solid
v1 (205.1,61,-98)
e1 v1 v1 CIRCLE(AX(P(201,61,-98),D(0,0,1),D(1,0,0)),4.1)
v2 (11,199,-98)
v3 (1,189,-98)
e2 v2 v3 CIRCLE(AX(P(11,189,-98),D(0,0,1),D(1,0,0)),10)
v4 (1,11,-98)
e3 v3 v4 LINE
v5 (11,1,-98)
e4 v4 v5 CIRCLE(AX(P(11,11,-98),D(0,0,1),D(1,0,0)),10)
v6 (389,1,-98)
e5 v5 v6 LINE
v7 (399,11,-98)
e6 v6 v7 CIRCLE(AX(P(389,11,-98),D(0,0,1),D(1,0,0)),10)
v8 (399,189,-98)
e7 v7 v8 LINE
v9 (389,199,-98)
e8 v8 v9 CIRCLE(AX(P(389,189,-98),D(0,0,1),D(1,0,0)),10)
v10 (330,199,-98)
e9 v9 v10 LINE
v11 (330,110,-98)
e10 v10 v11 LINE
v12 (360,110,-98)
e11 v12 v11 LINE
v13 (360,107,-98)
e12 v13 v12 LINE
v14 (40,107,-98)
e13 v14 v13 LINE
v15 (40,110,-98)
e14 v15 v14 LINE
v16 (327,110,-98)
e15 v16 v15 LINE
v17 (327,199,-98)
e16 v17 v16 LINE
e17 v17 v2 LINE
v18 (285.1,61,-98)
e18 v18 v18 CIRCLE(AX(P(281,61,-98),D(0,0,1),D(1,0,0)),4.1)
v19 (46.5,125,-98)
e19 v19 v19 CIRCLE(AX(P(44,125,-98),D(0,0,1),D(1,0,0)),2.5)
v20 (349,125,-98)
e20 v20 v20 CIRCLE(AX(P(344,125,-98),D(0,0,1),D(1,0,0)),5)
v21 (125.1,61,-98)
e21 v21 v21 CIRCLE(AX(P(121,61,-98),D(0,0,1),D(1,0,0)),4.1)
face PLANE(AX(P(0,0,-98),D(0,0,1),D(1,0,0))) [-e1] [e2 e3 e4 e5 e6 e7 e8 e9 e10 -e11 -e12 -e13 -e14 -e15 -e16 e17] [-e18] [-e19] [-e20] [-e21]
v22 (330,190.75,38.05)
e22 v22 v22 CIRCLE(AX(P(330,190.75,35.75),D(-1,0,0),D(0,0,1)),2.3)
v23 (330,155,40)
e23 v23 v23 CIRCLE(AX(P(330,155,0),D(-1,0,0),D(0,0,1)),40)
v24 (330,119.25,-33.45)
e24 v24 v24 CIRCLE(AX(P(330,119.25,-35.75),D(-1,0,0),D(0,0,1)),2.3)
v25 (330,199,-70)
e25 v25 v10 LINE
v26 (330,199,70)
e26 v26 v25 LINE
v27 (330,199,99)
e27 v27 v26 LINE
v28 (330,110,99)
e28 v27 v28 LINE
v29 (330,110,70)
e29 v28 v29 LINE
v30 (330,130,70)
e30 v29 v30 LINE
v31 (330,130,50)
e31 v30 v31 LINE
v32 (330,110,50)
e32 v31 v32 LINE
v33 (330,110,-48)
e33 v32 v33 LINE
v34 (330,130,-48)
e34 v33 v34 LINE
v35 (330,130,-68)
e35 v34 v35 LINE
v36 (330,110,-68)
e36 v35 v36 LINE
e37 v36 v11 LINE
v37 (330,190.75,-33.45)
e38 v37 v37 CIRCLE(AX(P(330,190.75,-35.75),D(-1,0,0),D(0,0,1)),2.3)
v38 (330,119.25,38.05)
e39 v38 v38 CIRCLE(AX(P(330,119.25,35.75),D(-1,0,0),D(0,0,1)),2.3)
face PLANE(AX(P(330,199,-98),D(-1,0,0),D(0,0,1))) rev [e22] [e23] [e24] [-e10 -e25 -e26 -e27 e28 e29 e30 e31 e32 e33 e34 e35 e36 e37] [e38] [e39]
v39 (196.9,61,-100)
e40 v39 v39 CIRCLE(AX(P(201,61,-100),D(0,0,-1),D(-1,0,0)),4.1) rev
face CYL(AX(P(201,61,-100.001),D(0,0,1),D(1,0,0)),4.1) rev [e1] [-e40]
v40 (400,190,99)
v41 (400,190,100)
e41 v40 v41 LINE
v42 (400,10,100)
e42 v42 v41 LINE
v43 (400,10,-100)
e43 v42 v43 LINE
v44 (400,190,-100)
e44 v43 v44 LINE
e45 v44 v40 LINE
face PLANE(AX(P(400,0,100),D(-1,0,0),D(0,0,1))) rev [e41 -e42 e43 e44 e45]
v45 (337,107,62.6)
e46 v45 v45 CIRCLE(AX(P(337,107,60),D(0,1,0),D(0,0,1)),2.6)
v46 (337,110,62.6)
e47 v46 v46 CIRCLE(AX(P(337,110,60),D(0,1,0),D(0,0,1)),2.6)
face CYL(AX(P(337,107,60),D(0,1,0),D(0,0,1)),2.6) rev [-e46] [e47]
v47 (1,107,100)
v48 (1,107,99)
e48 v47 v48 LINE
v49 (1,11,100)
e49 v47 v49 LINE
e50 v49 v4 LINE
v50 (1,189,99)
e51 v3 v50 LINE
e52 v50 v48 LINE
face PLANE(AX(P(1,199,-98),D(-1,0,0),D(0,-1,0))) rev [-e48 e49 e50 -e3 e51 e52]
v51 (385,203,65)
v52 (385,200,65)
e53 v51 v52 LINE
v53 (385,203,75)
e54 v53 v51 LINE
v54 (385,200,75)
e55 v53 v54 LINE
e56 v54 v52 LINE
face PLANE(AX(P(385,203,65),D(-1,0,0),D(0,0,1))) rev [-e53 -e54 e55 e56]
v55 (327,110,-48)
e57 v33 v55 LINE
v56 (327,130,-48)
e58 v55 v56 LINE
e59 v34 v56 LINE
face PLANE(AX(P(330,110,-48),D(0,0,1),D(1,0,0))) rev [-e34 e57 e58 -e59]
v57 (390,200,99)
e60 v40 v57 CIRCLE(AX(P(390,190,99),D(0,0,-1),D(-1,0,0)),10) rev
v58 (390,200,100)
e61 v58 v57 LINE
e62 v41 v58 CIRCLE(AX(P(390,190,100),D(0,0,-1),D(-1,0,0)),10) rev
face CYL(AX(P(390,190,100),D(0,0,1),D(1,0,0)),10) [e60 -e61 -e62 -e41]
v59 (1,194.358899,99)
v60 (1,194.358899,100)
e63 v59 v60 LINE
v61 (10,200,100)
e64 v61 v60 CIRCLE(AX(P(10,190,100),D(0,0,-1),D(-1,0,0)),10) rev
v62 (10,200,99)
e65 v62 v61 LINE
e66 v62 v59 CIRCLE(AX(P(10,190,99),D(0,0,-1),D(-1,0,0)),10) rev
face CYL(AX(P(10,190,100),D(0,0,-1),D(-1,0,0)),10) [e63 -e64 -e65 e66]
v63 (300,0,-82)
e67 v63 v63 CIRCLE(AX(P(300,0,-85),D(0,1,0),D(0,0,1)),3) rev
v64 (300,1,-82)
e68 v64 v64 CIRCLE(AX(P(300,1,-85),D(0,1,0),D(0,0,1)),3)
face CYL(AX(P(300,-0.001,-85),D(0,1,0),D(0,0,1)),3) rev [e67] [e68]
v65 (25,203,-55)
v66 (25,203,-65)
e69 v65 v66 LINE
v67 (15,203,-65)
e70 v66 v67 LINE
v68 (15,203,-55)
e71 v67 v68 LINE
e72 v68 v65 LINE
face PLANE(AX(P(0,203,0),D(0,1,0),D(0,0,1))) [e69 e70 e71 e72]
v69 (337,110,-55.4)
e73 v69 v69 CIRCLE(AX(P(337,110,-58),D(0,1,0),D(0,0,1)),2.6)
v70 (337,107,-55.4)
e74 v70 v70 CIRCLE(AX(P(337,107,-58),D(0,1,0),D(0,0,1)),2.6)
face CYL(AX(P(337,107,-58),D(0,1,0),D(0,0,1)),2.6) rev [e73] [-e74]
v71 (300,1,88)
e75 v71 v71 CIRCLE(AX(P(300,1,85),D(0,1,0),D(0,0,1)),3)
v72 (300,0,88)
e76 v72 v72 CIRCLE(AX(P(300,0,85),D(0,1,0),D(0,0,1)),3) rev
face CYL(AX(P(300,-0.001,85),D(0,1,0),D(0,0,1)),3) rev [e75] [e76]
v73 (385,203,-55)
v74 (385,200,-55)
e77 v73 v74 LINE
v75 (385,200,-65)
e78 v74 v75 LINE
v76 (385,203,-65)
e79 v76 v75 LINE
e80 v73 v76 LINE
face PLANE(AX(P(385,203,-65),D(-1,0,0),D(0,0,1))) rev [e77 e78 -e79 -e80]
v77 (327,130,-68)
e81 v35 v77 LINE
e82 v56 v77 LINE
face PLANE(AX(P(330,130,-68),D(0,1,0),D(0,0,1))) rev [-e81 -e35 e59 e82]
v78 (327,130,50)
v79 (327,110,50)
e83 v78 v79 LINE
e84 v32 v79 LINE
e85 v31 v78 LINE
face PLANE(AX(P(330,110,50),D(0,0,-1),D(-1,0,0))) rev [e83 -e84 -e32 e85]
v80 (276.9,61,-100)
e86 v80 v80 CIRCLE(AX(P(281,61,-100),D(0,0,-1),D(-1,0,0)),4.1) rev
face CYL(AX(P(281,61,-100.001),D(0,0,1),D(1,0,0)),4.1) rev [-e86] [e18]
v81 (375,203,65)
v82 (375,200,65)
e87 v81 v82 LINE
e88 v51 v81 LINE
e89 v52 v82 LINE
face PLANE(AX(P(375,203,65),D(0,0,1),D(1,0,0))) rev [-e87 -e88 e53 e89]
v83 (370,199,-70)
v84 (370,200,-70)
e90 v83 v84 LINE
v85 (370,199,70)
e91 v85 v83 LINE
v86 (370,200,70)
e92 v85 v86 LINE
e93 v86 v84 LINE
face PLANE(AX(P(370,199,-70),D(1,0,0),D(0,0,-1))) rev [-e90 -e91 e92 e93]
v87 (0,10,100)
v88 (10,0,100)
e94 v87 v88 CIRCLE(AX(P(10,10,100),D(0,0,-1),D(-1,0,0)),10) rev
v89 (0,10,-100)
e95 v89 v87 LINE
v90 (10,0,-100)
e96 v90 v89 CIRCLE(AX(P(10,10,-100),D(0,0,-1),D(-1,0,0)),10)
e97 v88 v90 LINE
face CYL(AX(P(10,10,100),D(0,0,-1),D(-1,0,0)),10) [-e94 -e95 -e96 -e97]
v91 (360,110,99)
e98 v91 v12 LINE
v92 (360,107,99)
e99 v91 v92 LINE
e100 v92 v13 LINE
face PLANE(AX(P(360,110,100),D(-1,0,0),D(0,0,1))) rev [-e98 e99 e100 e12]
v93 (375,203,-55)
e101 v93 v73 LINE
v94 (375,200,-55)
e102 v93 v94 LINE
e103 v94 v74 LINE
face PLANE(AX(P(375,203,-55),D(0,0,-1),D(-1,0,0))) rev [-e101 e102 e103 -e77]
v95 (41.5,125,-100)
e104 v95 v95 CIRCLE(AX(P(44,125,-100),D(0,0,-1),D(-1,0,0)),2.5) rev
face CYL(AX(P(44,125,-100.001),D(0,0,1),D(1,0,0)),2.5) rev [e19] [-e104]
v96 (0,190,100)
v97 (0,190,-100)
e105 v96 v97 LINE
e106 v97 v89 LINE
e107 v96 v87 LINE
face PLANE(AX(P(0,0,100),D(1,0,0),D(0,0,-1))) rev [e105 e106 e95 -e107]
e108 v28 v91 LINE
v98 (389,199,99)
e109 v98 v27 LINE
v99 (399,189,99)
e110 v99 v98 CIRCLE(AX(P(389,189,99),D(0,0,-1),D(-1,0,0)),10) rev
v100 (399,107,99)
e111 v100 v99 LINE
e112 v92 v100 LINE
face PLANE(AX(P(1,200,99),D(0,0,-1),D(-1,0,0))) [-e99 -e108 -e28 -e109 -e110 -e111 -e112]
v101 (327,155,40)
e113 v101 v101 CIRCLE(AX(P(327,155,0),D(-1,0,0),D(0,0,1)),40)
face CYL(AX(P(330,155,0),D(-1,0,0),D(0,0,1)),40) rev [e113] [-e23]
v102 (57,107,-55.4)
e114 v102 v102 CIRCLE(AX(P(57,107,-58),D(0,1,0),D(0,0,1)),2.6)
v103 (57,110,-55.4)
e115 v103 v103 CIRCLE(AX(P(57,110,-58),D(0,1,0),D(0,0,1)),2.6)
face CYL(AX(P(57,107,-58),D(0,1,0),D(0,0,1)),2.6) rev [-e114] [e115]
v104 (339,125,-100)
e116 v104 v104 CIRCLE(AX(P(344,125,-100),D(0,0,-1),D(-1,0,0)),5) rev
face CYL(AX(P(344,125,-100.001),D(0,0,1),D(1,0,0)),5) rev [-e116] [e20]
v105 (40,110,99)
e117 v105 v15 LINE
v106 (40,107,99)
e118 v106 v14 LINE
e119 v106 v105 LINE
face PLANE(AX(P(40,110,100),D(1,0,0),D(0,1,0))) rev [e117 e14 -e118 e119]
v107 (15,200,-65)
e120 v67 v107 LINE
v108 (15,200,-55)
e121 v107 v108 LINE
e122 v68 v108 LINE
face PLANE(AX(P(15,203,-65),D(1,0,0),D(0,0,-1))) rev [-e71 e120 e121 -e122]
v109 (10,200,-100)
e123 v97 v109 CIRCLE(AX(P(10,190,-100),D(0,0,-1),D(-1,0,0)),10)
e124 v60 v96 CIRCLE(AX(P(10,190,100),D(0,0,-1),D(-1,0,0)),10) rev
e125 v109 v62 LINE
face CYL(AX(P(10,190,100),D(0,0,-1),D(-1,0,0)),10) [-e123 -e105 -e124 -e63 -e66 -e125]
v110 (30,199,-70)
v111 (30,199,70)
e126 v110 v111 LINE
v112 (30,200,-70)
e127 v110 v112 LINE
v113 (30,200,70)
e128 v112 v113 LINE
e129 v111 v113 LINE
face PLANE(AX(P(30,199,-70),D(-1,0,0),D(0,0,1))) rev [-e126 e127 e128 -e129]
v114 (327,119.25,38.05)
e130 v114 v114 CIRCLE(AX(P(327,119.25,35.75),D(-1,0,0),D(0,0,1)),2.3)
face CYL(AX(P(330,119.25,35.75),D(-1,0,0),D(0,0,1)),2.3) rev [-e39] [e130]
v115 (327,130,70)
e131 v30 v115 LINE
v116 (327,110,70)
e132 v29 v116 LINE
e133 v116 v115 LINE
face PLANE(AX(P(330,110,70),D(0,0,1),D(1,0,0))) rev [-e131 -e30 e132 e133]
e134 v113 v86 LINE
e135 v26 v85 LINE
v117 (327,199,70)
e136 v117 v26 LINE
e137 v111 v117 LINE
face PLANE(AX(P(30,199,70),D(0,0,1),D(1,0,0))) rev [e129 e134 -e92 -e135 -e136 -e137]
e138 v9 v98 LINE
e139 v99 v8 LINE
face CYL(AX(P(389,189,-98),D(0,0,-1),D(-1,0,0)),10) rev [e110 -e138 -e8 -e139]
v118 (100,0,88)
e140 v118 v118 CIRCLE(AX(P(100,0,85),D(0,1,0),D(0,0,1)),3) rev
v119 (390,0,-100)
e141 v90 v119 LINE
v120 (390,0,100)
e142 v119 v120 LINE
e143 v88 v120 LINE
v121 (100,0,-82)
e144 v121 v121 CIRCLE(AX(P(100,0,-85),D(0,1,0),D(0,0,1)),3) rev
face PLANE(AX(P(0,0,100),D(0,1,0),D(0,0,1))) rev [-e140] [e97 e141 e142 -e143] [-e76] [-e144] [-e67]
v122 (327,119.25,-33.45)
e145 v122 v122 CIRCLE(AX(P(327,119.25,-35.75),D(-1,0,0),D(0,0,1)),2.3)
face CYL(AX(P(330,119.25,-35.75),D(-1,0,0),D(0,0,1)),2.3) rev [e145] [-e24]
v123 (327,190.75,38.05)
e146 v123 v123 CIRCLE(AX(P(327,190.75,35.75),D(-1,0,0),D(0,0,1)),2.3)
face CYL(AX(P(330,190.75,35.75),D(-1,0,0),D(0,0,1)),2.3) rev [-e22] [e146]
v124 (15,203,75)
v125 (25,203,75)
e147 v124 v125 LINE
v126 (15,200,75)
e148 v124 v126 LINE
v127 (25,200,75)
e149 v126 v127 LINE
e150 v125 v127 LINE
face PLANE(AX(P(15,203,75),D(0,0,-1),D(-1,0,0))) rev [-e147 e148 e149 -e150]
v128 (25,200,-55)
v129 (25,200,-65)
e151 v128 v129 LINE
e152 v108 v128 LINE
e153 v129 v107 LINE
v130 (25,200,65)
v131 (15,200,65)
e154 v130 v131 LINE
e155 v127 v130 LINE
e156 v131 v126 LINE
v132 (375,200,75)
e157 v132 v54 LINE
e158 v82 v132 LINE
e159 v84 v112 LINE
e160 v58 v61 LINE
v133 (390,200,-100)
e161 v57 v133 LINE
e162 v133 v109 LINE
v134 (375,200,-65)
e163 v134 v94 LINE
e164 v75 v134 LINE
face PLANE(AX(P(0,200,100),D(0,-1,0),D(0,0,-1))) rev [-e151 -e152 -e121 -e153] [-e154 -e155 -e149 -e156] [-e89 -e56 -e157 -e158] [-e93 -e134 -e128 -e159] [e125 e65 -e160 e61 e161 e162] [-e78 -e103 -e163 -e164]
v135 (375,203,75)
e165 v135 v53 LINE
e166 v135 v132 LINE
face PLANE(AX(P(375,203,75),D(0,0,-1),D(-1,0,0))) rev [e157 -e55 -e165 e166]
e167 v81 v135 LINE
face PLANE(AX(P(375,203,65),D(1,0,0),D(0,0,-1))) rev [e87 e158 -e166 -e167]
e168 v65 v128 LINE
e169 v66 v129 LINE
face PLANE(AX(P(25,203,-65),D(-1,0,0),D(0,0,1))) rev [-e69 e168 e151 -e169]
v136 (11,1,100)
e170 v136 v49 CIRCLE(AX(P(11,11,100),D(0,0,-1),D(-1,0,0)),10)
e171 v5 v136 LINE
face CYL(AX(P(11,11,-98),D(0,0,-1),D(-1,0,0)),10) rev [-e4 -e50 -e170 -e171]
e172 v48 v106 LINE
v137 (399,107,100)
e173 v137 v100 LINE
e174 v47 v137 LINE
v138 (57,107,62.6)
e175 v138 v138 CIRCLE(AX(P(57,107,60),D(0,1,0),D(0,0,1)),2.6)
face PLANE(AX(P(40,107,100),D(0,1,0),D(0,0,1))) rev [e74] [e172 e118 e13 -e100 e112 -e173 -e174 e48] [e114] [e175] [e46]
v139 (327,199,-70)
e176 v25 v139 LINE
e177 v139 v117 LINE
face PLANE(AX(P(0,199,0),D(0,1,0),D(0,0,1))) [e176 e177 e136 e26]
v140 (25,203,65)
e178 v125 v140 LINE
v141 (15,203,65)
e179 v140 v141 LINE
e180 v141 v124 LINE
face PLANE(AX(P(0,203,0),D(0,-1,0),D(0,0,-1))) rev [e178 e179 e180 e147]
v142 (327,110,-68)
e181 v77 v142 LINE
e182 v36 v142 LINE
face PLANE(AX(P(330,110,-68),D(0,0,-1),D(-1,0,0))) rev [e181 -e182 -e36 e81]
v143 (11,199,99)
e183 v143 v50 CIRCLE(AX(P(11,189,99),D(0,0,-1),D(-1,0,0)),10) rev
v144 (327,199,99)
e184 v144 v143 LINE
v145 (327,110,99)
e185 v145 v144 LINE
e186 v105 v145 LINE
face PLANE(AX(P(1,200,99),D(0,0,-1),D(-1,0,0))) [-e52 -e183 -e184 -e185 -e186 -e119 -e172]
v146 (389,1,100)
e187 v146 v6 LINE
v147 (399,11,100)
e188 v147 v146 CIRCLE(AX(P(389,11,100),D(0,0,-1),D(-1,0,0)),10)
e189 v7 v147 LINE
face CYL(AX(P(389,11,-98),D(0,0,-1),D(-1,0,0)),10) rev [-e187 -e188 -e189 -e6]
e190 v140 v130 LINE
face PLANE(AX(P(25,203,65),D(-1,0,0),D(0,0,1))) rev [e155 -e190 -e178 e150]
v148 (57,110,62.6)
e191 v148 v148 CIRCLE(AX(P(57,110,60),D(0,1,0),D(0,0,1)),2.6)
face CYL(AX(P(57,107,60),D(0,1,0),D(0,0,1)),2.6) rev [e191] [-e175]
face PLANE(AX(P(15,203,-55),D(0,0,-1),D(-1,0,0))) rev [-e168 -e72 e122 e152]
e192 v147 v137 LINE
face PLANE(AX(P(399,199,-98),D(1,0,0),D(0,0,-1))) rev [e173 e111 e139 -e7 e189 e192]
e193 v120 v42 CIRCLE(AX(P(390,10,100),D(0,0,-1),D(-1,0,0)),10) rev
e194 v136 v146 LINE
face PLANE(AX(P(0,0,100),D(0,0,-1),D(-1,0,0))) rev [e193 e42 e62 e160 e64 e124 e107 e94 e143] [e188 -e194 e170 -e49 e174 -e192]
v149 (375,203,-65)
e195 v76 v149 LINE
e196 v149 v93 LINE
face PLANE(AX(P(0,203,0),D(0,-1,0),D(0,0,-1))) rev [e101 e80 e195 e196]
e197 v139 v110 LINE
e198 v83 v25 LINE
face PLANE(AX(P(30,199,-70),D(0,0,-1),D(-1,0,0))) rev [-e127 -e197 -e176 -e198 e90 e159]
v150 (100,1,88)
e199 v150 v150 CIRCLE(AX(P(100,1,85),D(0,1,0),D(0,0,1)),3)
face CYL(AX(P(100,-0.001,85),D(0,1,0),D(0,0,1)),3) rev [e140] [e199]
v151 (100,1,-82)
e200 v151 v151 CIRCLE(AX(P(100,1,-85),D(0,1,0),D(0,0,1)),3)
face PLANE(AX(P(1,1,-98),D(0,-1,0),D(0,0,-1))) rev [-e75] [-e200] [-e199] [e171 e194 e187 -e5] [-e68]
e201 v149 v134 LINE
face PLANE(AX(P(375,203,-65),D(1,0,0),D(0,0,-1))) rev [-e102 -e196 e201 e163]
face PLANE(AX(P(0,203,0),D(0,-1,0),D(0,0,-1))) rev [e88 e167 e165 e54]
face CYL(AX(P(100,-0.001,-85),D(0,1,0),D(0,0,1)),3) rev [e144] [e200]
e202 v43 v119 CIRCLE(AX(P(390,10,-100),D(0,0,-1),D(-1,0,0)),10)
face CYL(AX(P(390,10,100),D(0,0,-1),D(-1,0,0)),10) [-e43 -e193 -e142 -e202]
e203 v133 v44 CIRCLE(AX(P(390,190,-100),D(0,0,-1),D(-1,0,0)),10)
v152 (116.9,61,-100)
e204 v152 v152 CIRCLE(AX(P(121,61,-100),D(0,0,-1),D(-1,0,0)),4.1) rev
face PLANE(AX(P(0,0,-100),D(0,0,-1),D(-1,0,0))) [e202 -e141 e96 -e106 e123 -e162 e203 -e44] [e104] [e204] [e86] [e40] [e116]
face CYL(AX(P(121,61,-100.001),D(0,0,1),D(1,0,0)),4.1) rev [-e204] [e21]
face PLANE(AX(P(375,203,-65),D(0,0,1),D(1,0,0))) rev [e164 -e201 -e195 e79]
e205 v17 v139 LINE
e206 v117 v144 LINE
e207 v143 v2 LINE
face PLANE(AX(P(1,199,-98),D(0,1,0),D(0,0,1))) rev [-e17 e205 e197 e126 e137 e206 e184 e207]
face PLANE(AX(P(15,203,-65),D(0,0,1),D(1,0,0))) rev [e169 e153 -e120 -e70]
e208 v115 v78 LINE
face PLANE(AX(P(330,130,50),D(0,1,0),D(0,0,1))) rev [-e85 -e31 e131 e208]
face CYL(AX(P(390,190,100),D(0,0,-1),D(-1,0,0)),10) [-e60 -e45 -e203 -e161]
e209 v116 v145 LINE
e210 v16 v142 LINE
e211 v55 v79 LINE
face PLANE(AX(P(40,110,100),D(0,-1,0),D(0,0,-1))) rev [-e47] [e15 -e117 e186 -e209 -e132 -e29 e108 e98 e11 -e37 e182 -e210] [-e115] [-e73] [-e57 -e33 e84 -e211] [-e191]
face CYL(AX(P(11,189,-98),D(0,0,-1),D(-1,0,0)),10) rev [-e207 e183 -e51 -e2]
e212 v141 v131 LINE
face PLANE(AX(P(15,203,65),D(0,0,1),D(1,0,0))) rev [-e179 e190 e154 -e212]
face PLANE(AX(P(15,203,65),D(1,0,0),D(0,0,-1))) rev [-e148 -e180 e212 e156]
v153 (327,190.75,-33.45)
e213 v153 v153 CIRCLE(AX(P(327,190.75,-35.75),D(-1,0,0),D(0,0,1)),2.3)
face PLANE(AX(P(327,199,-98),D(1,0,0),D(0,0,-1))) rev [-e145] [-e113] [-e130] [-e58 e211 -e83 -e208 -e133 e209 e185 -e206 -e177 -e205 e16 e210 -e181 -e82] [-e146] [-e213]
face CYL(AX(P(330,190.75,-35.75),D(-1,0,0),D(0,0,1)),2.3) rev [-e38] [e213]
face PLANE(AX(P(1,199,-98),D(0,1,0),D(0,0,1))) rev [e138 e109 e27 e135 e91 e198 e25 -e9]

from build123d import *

# Parameters (mm, degrees)
SKETCH1_W                 = 400
SKETCH1_H                 = 200
KHUNG_TRONG_DEPTH         = 100
SKETCH2_W                 = 398
SKETCH2_H                 = 198
DO_DAY_1MM_DEPTH          = 198
FILLET_10MM_4_GOC_R       = 10
SKETCH3_W                 = 320
SKETCH3_H                 = 3
TRAN_GIA_DEPTH            = 198
SKETCH5_W                 = 3
SKETCH5_H                 = 198
GIA_DO_QUAT_DEPTH         = 89
SKETCH6_R                 = 40
LO_DAT_QUAT_DEPTH         = 3
SKETCH7_R                 = 2.3
CO_DINH_QUAT_DEPTH        = 3
SKETCH9_W                 = 20
SKETCH9_H                 = 20
LO_THONG_CHO_DEN_DEPTH    = 3
SKETCH10_R                = 2.6
GIA_DO_DEN_DEPTH          = 3
DAY_NGUON_DEN_QUAT_REACH  = 491.085
SKETCH12_R                = 5
DAY_NGUON_DEN_REACH       = 491.085
SKETCH13_R                = 2.5
F_2_THANH_RAY_TANG1_REACH = 459.822
SKETCH14_R                = 3
GAN_CAM_BIEN_REACH        = 491.085
SKETCH15_R                = 4.1
SKETCH16_W                = 340
SKETCH16_H                = 140
NAP_THAM_DEPTH            = 1
SKETCH18_W                = 399
SKETCH18_H                = 1
CHE_TRAN_DEPTH            = 93
FILLET4_R                 = 10
SKETCH19_W                = 10
SKETCH19_H                = 10
CHOT_CO_DINH_DEPTH        = 3


with BuildPart() as part:
    # Sketch1 → khung_trong (new, symmetric)
    with BuildSketch(Plane.XY):
        with Locations((200, 100)):
            Rectangle(SKETCH1_W, SKETCH1_H)
    extrude(amount=KHUNG_TRONG_DEPTH, both=True)

    # Sketch2 → do_day_1mm (cut)
    with BuildSketch(Plane.XY.offset(100)):
        with Locations((200, 100)):
            Rectangle(SKETCH2_W, SKETCH2_H)
    extrude(amount=-DO_DAY_1MM_DEPTH, mode=Mode.SUBTRACT)

    # Fillet_10mm_4_goc
    fillet_10mm_4_goc_edges = [part.edges().sort_by_distance(p)[0] for p in [
        (1, 1, 1),
        (1, 199, 1),
        (399, 199, 1),
        (399, 1, 1),
        (0, 200, 0),
        (400, 200, 0),
        (400, 0, 0),
        (0, 0, 0),
    ]]
    fillet(fillet_10mm_4_goc_edges, radius=FILLET_10MM_4_GOC_R)

    # Sketch3 → tran_gia (add)
    with BuildSketch(Plane.XY.offset(-98)):
        with Locations((200, 108.5)):
            Rectangle(SKETCH3_W, SKETCH3_H)
    extrude(amount=TRAN_GIA_DEPTH)

    # Sketch5 → gia_do_quat (add)
    with BuildSketch(Plane(origin=(0, 110, 0), x_dir=(1, 0, 0), z_dir=(0, 1, 0))):
        with Locations((328.5, -1)):
            Rectangle(SKETCH5_W, SKETCH5_H)
    extrude(amount=GIA_DO_QUAT_DEPTH)

    # Sketch6 → lo_dat_quat (cut)
    with BuildSketch(Plane.ZY.offset(-327)):
        with Locations((0, 155)):
            Circle(SKETCH6_R)
    extrude(amount=-LO_DAT_QUAT_DEPTH, mode=Mode.SUBTRACT)

    # Sketch7 → co_dinh_quat (cut)
    with BuildSketch(Plane.ZY.offset(-327)):
        with Locations((-35.75, 190.75)):
            Circle(SKETCH7_R)
        with Locations((35.75, 190.75)):
            Circle(SKETCH7_R)
        with Locations((35.75, 119.25)):
            Circle(SKETCH7_R)
        with Locations((-35.75, 119.25)):
            Circle(SKETCH7_R)
    extrude(amount=-CO_DINH_QUAT_DEPTH, mode=Mode.SUBTRACT)

    # Sketch9 → lo_thong_cho _den (cut)
    with BuildSketch(Plane.ZY.offset(-327)):
        with Locations((-58, 120)):
            Rectangle(SKETCH9_W, SKETCH9_H)
        with Locations((60, 120)):
            Rectangle(SKETCH9_W, SKETCH9_H)
    extrude(amount=-LO_THONG_CHO_DEN_DEPTH, mode=Mode.SUBTRACT)

    # Sketch10 → gia_do_den (cut)
    with BuildSketch(Plane(origin=(0, 110, 0), x_dir=(1, 0, 0), z_dir=(0, 1, 0))):
        with Locations(Location((337, 58, 0), (0, 0, 270))):
            Circle(SKETCH10_R)
        with Locations(Location((337, -60, 0), (0, 0, 270))):
            Circle(SKETCH10_R)
        with Locations(Location((57, 58, 0), (0, 0, 270))):
            Circle(SKETCH10_R)
        with Locations(Location((57, -60, 0), (0, 0, 270))):
            Circle(SKETCH10_R)
    extrude(amount=-GIA_DO_DEN_DEPTH, mode=Mode.SUBTRACT)

    # Sketch12 → day_nguon_den_quat (cut, up to next)
    with BuildSketch(Plane.XY.offset(-98), mode=Mode.PRIVATE) as day_nguon_den_quat_sk1:
        with Locations((344, 125)):
            Circle(SKETCH12_R)
    day_nguon_den_quat_tool1 = extrude(day_nguon_den_quat_sk1.sketch, amount=-DAY_NGUON_DEN_QUAT_REACH, mode=Mode.PRIVATE) & part.part
    add(day_nguon_den_quat_tool1.solids().sort_by_distance((344, 125, -98))[0], mode=Mode.SUBTRACT)

    # Sketch13 → day_nguon_den (cut, up to next)
    with BuildSketch(Plane.XY.offset(-98), mode=Mode.PRIVATE) as day_nguon_den_sk1:
        with Locations((44, 125)):
            Circle(SKETCH13_R)
    day_nguon_den_tool1 = extrude(day_nguon_den_sk1.sketch, amount=-DAY_NGUON_DEN_REACH, mode=Mode.PRIVATE) & part.part
    add(day_nguon_den_tool1.solids().sort_by_distance((44, 125, -98))[0], mode=Mode.SUBTRACT)

    # Sketch14 → 2_thanh_ray_tang1 (cut, up to next)
    with BuildSketch(Plane(origin=(0, 1, 0), x_dir=(1, 0, 0), z_dir=(0, 1, 0)), mode=Mode.PRIVATE) as f_2_thanh_ray_tang1_sk1:
        with Locations(Location((100, 85, 0), (0, 0, 270))):
            Circle(SKETCH14_R)
    f_2_thanh_ray_tang1_tool1 = extrude(f_2_thanh_ray_tang1_sk1.sketch, amount=-F_2_THANH_RAY_TANG1_REACH, mode=Mode.PRIVATE) & part.part
    # Sketch14 → 2_thanh_ray_tang1 (cut, up to next)
    with BuildSketch(Plane(origin=(0, 1, 0), x_dir=(1, 0, 0), z_dir=(0, 1, 0)), mode=Mode.PRIVATE) as f_2_thanh_ray_tang1_sk2:
        with Locations(Location((300, 85, 0), (0, 0, 270))):
            Circle(SKETCH14_R)
    f_2_thanh_ray_tang1_tool2 = extrude(f_2_thanh_ray_tang1_sk2.sketch, amount=-F_2_THANH_RAY_TANG1_REACH, mode=Mode.PRIVATE) & part.part
    # Sketch14 → 2_thanh_ray_tang1 (cut, up to next)
    with BuildSketch(Plane(origin=(0, 1, 0), x_dir=(1, 0, 0), z_dir=(0, 1, 0)), mode=Mode.PRIVATE) as f_2_thanh_ray_tang1_sk3:
        with Locations(Location((300, -85, 0), (0, 0, 270))):
            Circle(SKETCH14_R)
    f_2_thanh_ray_tang1_tool3 = extrude(f_2_thanh_ray_tang1_sk3.sketch, amount=-F_2_THANH_RAY_TANG1_REACH, mode=Mode.PRIVATE) & part.part
    # Sketch14 → 2_thanh_ray_tang1 (cut, up to next)
    with BuildSketch(Plane(origin=(0, 1, 0), x_dir=(1, 0, 0), z_dir=(0, 1, 0)), mode=Mode.PRIVATE) as f_2_thanh_ray_tang1_sk4:
        with Locations(Location((100, -85, 0), (0, 0, 270))):
            Circle(SKETCH14_R)
    f_2_thanh_ray_tang1_tool4 = extrude(f_2_thanh_ray_tang1_sk4.sketch, amount=-F_2_THANH_RAY_TANG1_REACH, mode=Mode.PRIVATE) & part.part
    add(f_2_thanh_ray_tang1_tool1.solids().sort_by_distance((100, 1, -85))[0], mode=Mode.SUBTRACT)
    add(f_2_thanh_ray_tang1_tool2.solids().sort_by_distance((300, 1, -85))[0], mode=Mode.SUBTRACT)
    add(f_2_thanh_ray_tang1_tool3.solids().sort_by_distance((300, 1, 85))[0], mode=Mode.SUBTRACT)
    add(f_2_thanh_ray_tang1_tool4.solids().sort_by_distance((100, 1, 85))[0], mode=Mode.SUBTRACT)

    # Sketch15 → gan_cam_bien (cut, up to next)
    with BuildSketch(Plane.XY.offset(-98), mode=Mode.PRIVATE) as gan_cam_bien_sk1:
        with Locations((121, 61)):
            Circle(SKETCH15_R)
    gan_cam_bien_tool1 = extrude(gan_cam_bien_sk1.sketch, amount=-GAN_CAM_BIEN_REACH, mode=Mode.PRIVATE) & part.part
    # Sketch15 → gan_cam_bien (cut, up to next)
    with BuildSketch(Plane.XY.offset(-98), mode=Mode.PRIVATE) as gan_cam_bien_sk2:
        with Locations((201, 61)):
            Circle(SKETCH15_R)
    gan_cam_bien_tool2 = extrude(gan_cam_bien_sk2.sketch, amount=-GAN_CAM_BIEN_REACH, mode=Mode.PRIVATE) & part.part
    # Sketch15 → gan_cam_bien (cut, up to next)
    with BuildSketch(Plane.XY.offset(-98), mode=Mode.PRIVATE) as gan_cam_bien_sk3:
        with Locations((281, 61)):
            Circle(SKETCH15_R)
    gan_cam_bien_tool3 = extrude(gan_cam_bien_sk3.sketch, amount=-GAN_CAM_BIEN_REACH, mode=Mode.PRIVATE) & part.part
    add(gan_cam_bien_tool1.solids().sort_by_distance((121, 61, -98))[0], mode=Mode.SUBTRACT)
    add(gan_cam_bien_tool2.solids().sort_by_distance((201, 61, -98))[0], mode=Mode.SUBTRACT)
    add(gan_cam_bien_tool3.solids().sort_by_distance((281, 61, -98))[0], mode=Mode.SUBTRACT)

    # Sketch16 → nap_tham (cut)
    with BuildSketch(Plane(origin=(0, 200, 0), x_dir=(1, 0, 0), z_dir=(0, 1, 0))):
        with Locations((200, 0)):
            Rectangle(SKETCH16_W, SKETCH16_H)
    extrude(amount=-NAP_THAM_DEPTH, mode=Mode.SUBTRACT)

    # Sketch18 → che_tran (add)
    with BuildSketch(Plane.XZ.offset(-107)):
        with Locations((200.5, 99.5)):
            Rectangle(SKETCH18_W, SKETCH18_H)
    extrude(amount=-CHE_TRAN_DEPTH)

    # Fillet4
    # the kernel refuses this fillet: 10 mm, written as the material it takes off along each edge
    with BuildSketch(Plane(origin=(400, 200, 125), x_dir=(-1, 0, 0), z_dir=(0, 0, -1))) as fillet4_piece_1:
        with BuildLine():
            CenterArc((FILLET4_R, -FILLET4_R), FILLET4_R, 90, 90)
            Line((0, -FILLET4_R), (-FILLET4_R * 0.02, -FILLET4_R))
            Line((-FILLET4_R * 0.02, -FILLET4_R), (-FILLET4_R * 0.02, FILLET4_R * 0.02))
            Line((-FILLET4_R * 0.02, FILLET4_R * 0.02), (FILLET4_R, FILLET4_R * 0.02))
            Line((FILLET4_R, FILLET4_R * 0.02), (FILLET4_R, 0))
        make_face()
    extrude(amount=51, mode=Mode.SUBTRACT)
    with BuildSketch(Plane(origin=(1, 200, 76.5), x_dir=(1, 0, 0), z_dir=(0, 0, 1))) as fillet4_piece_2:
        with BuildLine():
            CenterArc((9, -10), FILLET4_R, 90, 64.158067237)
            Line((0, -5.641101056), (-0.18, -5.553923078))
            ThreePointArc((-0.18, -5.553923078), (-0.2, -2.820550528), (-0.2, 0))
            Line((-0.2, 0), (0, 0.2))
            Line((0, 0.2), (9, 0.2))
            Line((9, 0.2), (9, 0))
        make_face()
    extrude(amount=46, mode=Mode.SUBTRACT)

    # Sketch19 → chot_co_dinh (add)
    with BuildSketch(Plane(origin=(0, 200, 0), x_dir=(1, 0, 0), z_dir=(0, 1, 0))):
        with Locations((20, 60)):
            Rectangle(SKETCH19_W, SKETCH19_H)
        with Locations((380, 60)):
            Rectangle(SKETCH19_W, SKETCH19_H)
        with Locations((380, -70)):
            Rectangle(SKETCH19_W, SKETCH19_H)
        with Locations((20, -70)):
            Rectangle(SKETCH19_W, SKETCH19_H)
    extrude(amount=CHOT_CO_DINH_DEPTH)


solid = part.part
